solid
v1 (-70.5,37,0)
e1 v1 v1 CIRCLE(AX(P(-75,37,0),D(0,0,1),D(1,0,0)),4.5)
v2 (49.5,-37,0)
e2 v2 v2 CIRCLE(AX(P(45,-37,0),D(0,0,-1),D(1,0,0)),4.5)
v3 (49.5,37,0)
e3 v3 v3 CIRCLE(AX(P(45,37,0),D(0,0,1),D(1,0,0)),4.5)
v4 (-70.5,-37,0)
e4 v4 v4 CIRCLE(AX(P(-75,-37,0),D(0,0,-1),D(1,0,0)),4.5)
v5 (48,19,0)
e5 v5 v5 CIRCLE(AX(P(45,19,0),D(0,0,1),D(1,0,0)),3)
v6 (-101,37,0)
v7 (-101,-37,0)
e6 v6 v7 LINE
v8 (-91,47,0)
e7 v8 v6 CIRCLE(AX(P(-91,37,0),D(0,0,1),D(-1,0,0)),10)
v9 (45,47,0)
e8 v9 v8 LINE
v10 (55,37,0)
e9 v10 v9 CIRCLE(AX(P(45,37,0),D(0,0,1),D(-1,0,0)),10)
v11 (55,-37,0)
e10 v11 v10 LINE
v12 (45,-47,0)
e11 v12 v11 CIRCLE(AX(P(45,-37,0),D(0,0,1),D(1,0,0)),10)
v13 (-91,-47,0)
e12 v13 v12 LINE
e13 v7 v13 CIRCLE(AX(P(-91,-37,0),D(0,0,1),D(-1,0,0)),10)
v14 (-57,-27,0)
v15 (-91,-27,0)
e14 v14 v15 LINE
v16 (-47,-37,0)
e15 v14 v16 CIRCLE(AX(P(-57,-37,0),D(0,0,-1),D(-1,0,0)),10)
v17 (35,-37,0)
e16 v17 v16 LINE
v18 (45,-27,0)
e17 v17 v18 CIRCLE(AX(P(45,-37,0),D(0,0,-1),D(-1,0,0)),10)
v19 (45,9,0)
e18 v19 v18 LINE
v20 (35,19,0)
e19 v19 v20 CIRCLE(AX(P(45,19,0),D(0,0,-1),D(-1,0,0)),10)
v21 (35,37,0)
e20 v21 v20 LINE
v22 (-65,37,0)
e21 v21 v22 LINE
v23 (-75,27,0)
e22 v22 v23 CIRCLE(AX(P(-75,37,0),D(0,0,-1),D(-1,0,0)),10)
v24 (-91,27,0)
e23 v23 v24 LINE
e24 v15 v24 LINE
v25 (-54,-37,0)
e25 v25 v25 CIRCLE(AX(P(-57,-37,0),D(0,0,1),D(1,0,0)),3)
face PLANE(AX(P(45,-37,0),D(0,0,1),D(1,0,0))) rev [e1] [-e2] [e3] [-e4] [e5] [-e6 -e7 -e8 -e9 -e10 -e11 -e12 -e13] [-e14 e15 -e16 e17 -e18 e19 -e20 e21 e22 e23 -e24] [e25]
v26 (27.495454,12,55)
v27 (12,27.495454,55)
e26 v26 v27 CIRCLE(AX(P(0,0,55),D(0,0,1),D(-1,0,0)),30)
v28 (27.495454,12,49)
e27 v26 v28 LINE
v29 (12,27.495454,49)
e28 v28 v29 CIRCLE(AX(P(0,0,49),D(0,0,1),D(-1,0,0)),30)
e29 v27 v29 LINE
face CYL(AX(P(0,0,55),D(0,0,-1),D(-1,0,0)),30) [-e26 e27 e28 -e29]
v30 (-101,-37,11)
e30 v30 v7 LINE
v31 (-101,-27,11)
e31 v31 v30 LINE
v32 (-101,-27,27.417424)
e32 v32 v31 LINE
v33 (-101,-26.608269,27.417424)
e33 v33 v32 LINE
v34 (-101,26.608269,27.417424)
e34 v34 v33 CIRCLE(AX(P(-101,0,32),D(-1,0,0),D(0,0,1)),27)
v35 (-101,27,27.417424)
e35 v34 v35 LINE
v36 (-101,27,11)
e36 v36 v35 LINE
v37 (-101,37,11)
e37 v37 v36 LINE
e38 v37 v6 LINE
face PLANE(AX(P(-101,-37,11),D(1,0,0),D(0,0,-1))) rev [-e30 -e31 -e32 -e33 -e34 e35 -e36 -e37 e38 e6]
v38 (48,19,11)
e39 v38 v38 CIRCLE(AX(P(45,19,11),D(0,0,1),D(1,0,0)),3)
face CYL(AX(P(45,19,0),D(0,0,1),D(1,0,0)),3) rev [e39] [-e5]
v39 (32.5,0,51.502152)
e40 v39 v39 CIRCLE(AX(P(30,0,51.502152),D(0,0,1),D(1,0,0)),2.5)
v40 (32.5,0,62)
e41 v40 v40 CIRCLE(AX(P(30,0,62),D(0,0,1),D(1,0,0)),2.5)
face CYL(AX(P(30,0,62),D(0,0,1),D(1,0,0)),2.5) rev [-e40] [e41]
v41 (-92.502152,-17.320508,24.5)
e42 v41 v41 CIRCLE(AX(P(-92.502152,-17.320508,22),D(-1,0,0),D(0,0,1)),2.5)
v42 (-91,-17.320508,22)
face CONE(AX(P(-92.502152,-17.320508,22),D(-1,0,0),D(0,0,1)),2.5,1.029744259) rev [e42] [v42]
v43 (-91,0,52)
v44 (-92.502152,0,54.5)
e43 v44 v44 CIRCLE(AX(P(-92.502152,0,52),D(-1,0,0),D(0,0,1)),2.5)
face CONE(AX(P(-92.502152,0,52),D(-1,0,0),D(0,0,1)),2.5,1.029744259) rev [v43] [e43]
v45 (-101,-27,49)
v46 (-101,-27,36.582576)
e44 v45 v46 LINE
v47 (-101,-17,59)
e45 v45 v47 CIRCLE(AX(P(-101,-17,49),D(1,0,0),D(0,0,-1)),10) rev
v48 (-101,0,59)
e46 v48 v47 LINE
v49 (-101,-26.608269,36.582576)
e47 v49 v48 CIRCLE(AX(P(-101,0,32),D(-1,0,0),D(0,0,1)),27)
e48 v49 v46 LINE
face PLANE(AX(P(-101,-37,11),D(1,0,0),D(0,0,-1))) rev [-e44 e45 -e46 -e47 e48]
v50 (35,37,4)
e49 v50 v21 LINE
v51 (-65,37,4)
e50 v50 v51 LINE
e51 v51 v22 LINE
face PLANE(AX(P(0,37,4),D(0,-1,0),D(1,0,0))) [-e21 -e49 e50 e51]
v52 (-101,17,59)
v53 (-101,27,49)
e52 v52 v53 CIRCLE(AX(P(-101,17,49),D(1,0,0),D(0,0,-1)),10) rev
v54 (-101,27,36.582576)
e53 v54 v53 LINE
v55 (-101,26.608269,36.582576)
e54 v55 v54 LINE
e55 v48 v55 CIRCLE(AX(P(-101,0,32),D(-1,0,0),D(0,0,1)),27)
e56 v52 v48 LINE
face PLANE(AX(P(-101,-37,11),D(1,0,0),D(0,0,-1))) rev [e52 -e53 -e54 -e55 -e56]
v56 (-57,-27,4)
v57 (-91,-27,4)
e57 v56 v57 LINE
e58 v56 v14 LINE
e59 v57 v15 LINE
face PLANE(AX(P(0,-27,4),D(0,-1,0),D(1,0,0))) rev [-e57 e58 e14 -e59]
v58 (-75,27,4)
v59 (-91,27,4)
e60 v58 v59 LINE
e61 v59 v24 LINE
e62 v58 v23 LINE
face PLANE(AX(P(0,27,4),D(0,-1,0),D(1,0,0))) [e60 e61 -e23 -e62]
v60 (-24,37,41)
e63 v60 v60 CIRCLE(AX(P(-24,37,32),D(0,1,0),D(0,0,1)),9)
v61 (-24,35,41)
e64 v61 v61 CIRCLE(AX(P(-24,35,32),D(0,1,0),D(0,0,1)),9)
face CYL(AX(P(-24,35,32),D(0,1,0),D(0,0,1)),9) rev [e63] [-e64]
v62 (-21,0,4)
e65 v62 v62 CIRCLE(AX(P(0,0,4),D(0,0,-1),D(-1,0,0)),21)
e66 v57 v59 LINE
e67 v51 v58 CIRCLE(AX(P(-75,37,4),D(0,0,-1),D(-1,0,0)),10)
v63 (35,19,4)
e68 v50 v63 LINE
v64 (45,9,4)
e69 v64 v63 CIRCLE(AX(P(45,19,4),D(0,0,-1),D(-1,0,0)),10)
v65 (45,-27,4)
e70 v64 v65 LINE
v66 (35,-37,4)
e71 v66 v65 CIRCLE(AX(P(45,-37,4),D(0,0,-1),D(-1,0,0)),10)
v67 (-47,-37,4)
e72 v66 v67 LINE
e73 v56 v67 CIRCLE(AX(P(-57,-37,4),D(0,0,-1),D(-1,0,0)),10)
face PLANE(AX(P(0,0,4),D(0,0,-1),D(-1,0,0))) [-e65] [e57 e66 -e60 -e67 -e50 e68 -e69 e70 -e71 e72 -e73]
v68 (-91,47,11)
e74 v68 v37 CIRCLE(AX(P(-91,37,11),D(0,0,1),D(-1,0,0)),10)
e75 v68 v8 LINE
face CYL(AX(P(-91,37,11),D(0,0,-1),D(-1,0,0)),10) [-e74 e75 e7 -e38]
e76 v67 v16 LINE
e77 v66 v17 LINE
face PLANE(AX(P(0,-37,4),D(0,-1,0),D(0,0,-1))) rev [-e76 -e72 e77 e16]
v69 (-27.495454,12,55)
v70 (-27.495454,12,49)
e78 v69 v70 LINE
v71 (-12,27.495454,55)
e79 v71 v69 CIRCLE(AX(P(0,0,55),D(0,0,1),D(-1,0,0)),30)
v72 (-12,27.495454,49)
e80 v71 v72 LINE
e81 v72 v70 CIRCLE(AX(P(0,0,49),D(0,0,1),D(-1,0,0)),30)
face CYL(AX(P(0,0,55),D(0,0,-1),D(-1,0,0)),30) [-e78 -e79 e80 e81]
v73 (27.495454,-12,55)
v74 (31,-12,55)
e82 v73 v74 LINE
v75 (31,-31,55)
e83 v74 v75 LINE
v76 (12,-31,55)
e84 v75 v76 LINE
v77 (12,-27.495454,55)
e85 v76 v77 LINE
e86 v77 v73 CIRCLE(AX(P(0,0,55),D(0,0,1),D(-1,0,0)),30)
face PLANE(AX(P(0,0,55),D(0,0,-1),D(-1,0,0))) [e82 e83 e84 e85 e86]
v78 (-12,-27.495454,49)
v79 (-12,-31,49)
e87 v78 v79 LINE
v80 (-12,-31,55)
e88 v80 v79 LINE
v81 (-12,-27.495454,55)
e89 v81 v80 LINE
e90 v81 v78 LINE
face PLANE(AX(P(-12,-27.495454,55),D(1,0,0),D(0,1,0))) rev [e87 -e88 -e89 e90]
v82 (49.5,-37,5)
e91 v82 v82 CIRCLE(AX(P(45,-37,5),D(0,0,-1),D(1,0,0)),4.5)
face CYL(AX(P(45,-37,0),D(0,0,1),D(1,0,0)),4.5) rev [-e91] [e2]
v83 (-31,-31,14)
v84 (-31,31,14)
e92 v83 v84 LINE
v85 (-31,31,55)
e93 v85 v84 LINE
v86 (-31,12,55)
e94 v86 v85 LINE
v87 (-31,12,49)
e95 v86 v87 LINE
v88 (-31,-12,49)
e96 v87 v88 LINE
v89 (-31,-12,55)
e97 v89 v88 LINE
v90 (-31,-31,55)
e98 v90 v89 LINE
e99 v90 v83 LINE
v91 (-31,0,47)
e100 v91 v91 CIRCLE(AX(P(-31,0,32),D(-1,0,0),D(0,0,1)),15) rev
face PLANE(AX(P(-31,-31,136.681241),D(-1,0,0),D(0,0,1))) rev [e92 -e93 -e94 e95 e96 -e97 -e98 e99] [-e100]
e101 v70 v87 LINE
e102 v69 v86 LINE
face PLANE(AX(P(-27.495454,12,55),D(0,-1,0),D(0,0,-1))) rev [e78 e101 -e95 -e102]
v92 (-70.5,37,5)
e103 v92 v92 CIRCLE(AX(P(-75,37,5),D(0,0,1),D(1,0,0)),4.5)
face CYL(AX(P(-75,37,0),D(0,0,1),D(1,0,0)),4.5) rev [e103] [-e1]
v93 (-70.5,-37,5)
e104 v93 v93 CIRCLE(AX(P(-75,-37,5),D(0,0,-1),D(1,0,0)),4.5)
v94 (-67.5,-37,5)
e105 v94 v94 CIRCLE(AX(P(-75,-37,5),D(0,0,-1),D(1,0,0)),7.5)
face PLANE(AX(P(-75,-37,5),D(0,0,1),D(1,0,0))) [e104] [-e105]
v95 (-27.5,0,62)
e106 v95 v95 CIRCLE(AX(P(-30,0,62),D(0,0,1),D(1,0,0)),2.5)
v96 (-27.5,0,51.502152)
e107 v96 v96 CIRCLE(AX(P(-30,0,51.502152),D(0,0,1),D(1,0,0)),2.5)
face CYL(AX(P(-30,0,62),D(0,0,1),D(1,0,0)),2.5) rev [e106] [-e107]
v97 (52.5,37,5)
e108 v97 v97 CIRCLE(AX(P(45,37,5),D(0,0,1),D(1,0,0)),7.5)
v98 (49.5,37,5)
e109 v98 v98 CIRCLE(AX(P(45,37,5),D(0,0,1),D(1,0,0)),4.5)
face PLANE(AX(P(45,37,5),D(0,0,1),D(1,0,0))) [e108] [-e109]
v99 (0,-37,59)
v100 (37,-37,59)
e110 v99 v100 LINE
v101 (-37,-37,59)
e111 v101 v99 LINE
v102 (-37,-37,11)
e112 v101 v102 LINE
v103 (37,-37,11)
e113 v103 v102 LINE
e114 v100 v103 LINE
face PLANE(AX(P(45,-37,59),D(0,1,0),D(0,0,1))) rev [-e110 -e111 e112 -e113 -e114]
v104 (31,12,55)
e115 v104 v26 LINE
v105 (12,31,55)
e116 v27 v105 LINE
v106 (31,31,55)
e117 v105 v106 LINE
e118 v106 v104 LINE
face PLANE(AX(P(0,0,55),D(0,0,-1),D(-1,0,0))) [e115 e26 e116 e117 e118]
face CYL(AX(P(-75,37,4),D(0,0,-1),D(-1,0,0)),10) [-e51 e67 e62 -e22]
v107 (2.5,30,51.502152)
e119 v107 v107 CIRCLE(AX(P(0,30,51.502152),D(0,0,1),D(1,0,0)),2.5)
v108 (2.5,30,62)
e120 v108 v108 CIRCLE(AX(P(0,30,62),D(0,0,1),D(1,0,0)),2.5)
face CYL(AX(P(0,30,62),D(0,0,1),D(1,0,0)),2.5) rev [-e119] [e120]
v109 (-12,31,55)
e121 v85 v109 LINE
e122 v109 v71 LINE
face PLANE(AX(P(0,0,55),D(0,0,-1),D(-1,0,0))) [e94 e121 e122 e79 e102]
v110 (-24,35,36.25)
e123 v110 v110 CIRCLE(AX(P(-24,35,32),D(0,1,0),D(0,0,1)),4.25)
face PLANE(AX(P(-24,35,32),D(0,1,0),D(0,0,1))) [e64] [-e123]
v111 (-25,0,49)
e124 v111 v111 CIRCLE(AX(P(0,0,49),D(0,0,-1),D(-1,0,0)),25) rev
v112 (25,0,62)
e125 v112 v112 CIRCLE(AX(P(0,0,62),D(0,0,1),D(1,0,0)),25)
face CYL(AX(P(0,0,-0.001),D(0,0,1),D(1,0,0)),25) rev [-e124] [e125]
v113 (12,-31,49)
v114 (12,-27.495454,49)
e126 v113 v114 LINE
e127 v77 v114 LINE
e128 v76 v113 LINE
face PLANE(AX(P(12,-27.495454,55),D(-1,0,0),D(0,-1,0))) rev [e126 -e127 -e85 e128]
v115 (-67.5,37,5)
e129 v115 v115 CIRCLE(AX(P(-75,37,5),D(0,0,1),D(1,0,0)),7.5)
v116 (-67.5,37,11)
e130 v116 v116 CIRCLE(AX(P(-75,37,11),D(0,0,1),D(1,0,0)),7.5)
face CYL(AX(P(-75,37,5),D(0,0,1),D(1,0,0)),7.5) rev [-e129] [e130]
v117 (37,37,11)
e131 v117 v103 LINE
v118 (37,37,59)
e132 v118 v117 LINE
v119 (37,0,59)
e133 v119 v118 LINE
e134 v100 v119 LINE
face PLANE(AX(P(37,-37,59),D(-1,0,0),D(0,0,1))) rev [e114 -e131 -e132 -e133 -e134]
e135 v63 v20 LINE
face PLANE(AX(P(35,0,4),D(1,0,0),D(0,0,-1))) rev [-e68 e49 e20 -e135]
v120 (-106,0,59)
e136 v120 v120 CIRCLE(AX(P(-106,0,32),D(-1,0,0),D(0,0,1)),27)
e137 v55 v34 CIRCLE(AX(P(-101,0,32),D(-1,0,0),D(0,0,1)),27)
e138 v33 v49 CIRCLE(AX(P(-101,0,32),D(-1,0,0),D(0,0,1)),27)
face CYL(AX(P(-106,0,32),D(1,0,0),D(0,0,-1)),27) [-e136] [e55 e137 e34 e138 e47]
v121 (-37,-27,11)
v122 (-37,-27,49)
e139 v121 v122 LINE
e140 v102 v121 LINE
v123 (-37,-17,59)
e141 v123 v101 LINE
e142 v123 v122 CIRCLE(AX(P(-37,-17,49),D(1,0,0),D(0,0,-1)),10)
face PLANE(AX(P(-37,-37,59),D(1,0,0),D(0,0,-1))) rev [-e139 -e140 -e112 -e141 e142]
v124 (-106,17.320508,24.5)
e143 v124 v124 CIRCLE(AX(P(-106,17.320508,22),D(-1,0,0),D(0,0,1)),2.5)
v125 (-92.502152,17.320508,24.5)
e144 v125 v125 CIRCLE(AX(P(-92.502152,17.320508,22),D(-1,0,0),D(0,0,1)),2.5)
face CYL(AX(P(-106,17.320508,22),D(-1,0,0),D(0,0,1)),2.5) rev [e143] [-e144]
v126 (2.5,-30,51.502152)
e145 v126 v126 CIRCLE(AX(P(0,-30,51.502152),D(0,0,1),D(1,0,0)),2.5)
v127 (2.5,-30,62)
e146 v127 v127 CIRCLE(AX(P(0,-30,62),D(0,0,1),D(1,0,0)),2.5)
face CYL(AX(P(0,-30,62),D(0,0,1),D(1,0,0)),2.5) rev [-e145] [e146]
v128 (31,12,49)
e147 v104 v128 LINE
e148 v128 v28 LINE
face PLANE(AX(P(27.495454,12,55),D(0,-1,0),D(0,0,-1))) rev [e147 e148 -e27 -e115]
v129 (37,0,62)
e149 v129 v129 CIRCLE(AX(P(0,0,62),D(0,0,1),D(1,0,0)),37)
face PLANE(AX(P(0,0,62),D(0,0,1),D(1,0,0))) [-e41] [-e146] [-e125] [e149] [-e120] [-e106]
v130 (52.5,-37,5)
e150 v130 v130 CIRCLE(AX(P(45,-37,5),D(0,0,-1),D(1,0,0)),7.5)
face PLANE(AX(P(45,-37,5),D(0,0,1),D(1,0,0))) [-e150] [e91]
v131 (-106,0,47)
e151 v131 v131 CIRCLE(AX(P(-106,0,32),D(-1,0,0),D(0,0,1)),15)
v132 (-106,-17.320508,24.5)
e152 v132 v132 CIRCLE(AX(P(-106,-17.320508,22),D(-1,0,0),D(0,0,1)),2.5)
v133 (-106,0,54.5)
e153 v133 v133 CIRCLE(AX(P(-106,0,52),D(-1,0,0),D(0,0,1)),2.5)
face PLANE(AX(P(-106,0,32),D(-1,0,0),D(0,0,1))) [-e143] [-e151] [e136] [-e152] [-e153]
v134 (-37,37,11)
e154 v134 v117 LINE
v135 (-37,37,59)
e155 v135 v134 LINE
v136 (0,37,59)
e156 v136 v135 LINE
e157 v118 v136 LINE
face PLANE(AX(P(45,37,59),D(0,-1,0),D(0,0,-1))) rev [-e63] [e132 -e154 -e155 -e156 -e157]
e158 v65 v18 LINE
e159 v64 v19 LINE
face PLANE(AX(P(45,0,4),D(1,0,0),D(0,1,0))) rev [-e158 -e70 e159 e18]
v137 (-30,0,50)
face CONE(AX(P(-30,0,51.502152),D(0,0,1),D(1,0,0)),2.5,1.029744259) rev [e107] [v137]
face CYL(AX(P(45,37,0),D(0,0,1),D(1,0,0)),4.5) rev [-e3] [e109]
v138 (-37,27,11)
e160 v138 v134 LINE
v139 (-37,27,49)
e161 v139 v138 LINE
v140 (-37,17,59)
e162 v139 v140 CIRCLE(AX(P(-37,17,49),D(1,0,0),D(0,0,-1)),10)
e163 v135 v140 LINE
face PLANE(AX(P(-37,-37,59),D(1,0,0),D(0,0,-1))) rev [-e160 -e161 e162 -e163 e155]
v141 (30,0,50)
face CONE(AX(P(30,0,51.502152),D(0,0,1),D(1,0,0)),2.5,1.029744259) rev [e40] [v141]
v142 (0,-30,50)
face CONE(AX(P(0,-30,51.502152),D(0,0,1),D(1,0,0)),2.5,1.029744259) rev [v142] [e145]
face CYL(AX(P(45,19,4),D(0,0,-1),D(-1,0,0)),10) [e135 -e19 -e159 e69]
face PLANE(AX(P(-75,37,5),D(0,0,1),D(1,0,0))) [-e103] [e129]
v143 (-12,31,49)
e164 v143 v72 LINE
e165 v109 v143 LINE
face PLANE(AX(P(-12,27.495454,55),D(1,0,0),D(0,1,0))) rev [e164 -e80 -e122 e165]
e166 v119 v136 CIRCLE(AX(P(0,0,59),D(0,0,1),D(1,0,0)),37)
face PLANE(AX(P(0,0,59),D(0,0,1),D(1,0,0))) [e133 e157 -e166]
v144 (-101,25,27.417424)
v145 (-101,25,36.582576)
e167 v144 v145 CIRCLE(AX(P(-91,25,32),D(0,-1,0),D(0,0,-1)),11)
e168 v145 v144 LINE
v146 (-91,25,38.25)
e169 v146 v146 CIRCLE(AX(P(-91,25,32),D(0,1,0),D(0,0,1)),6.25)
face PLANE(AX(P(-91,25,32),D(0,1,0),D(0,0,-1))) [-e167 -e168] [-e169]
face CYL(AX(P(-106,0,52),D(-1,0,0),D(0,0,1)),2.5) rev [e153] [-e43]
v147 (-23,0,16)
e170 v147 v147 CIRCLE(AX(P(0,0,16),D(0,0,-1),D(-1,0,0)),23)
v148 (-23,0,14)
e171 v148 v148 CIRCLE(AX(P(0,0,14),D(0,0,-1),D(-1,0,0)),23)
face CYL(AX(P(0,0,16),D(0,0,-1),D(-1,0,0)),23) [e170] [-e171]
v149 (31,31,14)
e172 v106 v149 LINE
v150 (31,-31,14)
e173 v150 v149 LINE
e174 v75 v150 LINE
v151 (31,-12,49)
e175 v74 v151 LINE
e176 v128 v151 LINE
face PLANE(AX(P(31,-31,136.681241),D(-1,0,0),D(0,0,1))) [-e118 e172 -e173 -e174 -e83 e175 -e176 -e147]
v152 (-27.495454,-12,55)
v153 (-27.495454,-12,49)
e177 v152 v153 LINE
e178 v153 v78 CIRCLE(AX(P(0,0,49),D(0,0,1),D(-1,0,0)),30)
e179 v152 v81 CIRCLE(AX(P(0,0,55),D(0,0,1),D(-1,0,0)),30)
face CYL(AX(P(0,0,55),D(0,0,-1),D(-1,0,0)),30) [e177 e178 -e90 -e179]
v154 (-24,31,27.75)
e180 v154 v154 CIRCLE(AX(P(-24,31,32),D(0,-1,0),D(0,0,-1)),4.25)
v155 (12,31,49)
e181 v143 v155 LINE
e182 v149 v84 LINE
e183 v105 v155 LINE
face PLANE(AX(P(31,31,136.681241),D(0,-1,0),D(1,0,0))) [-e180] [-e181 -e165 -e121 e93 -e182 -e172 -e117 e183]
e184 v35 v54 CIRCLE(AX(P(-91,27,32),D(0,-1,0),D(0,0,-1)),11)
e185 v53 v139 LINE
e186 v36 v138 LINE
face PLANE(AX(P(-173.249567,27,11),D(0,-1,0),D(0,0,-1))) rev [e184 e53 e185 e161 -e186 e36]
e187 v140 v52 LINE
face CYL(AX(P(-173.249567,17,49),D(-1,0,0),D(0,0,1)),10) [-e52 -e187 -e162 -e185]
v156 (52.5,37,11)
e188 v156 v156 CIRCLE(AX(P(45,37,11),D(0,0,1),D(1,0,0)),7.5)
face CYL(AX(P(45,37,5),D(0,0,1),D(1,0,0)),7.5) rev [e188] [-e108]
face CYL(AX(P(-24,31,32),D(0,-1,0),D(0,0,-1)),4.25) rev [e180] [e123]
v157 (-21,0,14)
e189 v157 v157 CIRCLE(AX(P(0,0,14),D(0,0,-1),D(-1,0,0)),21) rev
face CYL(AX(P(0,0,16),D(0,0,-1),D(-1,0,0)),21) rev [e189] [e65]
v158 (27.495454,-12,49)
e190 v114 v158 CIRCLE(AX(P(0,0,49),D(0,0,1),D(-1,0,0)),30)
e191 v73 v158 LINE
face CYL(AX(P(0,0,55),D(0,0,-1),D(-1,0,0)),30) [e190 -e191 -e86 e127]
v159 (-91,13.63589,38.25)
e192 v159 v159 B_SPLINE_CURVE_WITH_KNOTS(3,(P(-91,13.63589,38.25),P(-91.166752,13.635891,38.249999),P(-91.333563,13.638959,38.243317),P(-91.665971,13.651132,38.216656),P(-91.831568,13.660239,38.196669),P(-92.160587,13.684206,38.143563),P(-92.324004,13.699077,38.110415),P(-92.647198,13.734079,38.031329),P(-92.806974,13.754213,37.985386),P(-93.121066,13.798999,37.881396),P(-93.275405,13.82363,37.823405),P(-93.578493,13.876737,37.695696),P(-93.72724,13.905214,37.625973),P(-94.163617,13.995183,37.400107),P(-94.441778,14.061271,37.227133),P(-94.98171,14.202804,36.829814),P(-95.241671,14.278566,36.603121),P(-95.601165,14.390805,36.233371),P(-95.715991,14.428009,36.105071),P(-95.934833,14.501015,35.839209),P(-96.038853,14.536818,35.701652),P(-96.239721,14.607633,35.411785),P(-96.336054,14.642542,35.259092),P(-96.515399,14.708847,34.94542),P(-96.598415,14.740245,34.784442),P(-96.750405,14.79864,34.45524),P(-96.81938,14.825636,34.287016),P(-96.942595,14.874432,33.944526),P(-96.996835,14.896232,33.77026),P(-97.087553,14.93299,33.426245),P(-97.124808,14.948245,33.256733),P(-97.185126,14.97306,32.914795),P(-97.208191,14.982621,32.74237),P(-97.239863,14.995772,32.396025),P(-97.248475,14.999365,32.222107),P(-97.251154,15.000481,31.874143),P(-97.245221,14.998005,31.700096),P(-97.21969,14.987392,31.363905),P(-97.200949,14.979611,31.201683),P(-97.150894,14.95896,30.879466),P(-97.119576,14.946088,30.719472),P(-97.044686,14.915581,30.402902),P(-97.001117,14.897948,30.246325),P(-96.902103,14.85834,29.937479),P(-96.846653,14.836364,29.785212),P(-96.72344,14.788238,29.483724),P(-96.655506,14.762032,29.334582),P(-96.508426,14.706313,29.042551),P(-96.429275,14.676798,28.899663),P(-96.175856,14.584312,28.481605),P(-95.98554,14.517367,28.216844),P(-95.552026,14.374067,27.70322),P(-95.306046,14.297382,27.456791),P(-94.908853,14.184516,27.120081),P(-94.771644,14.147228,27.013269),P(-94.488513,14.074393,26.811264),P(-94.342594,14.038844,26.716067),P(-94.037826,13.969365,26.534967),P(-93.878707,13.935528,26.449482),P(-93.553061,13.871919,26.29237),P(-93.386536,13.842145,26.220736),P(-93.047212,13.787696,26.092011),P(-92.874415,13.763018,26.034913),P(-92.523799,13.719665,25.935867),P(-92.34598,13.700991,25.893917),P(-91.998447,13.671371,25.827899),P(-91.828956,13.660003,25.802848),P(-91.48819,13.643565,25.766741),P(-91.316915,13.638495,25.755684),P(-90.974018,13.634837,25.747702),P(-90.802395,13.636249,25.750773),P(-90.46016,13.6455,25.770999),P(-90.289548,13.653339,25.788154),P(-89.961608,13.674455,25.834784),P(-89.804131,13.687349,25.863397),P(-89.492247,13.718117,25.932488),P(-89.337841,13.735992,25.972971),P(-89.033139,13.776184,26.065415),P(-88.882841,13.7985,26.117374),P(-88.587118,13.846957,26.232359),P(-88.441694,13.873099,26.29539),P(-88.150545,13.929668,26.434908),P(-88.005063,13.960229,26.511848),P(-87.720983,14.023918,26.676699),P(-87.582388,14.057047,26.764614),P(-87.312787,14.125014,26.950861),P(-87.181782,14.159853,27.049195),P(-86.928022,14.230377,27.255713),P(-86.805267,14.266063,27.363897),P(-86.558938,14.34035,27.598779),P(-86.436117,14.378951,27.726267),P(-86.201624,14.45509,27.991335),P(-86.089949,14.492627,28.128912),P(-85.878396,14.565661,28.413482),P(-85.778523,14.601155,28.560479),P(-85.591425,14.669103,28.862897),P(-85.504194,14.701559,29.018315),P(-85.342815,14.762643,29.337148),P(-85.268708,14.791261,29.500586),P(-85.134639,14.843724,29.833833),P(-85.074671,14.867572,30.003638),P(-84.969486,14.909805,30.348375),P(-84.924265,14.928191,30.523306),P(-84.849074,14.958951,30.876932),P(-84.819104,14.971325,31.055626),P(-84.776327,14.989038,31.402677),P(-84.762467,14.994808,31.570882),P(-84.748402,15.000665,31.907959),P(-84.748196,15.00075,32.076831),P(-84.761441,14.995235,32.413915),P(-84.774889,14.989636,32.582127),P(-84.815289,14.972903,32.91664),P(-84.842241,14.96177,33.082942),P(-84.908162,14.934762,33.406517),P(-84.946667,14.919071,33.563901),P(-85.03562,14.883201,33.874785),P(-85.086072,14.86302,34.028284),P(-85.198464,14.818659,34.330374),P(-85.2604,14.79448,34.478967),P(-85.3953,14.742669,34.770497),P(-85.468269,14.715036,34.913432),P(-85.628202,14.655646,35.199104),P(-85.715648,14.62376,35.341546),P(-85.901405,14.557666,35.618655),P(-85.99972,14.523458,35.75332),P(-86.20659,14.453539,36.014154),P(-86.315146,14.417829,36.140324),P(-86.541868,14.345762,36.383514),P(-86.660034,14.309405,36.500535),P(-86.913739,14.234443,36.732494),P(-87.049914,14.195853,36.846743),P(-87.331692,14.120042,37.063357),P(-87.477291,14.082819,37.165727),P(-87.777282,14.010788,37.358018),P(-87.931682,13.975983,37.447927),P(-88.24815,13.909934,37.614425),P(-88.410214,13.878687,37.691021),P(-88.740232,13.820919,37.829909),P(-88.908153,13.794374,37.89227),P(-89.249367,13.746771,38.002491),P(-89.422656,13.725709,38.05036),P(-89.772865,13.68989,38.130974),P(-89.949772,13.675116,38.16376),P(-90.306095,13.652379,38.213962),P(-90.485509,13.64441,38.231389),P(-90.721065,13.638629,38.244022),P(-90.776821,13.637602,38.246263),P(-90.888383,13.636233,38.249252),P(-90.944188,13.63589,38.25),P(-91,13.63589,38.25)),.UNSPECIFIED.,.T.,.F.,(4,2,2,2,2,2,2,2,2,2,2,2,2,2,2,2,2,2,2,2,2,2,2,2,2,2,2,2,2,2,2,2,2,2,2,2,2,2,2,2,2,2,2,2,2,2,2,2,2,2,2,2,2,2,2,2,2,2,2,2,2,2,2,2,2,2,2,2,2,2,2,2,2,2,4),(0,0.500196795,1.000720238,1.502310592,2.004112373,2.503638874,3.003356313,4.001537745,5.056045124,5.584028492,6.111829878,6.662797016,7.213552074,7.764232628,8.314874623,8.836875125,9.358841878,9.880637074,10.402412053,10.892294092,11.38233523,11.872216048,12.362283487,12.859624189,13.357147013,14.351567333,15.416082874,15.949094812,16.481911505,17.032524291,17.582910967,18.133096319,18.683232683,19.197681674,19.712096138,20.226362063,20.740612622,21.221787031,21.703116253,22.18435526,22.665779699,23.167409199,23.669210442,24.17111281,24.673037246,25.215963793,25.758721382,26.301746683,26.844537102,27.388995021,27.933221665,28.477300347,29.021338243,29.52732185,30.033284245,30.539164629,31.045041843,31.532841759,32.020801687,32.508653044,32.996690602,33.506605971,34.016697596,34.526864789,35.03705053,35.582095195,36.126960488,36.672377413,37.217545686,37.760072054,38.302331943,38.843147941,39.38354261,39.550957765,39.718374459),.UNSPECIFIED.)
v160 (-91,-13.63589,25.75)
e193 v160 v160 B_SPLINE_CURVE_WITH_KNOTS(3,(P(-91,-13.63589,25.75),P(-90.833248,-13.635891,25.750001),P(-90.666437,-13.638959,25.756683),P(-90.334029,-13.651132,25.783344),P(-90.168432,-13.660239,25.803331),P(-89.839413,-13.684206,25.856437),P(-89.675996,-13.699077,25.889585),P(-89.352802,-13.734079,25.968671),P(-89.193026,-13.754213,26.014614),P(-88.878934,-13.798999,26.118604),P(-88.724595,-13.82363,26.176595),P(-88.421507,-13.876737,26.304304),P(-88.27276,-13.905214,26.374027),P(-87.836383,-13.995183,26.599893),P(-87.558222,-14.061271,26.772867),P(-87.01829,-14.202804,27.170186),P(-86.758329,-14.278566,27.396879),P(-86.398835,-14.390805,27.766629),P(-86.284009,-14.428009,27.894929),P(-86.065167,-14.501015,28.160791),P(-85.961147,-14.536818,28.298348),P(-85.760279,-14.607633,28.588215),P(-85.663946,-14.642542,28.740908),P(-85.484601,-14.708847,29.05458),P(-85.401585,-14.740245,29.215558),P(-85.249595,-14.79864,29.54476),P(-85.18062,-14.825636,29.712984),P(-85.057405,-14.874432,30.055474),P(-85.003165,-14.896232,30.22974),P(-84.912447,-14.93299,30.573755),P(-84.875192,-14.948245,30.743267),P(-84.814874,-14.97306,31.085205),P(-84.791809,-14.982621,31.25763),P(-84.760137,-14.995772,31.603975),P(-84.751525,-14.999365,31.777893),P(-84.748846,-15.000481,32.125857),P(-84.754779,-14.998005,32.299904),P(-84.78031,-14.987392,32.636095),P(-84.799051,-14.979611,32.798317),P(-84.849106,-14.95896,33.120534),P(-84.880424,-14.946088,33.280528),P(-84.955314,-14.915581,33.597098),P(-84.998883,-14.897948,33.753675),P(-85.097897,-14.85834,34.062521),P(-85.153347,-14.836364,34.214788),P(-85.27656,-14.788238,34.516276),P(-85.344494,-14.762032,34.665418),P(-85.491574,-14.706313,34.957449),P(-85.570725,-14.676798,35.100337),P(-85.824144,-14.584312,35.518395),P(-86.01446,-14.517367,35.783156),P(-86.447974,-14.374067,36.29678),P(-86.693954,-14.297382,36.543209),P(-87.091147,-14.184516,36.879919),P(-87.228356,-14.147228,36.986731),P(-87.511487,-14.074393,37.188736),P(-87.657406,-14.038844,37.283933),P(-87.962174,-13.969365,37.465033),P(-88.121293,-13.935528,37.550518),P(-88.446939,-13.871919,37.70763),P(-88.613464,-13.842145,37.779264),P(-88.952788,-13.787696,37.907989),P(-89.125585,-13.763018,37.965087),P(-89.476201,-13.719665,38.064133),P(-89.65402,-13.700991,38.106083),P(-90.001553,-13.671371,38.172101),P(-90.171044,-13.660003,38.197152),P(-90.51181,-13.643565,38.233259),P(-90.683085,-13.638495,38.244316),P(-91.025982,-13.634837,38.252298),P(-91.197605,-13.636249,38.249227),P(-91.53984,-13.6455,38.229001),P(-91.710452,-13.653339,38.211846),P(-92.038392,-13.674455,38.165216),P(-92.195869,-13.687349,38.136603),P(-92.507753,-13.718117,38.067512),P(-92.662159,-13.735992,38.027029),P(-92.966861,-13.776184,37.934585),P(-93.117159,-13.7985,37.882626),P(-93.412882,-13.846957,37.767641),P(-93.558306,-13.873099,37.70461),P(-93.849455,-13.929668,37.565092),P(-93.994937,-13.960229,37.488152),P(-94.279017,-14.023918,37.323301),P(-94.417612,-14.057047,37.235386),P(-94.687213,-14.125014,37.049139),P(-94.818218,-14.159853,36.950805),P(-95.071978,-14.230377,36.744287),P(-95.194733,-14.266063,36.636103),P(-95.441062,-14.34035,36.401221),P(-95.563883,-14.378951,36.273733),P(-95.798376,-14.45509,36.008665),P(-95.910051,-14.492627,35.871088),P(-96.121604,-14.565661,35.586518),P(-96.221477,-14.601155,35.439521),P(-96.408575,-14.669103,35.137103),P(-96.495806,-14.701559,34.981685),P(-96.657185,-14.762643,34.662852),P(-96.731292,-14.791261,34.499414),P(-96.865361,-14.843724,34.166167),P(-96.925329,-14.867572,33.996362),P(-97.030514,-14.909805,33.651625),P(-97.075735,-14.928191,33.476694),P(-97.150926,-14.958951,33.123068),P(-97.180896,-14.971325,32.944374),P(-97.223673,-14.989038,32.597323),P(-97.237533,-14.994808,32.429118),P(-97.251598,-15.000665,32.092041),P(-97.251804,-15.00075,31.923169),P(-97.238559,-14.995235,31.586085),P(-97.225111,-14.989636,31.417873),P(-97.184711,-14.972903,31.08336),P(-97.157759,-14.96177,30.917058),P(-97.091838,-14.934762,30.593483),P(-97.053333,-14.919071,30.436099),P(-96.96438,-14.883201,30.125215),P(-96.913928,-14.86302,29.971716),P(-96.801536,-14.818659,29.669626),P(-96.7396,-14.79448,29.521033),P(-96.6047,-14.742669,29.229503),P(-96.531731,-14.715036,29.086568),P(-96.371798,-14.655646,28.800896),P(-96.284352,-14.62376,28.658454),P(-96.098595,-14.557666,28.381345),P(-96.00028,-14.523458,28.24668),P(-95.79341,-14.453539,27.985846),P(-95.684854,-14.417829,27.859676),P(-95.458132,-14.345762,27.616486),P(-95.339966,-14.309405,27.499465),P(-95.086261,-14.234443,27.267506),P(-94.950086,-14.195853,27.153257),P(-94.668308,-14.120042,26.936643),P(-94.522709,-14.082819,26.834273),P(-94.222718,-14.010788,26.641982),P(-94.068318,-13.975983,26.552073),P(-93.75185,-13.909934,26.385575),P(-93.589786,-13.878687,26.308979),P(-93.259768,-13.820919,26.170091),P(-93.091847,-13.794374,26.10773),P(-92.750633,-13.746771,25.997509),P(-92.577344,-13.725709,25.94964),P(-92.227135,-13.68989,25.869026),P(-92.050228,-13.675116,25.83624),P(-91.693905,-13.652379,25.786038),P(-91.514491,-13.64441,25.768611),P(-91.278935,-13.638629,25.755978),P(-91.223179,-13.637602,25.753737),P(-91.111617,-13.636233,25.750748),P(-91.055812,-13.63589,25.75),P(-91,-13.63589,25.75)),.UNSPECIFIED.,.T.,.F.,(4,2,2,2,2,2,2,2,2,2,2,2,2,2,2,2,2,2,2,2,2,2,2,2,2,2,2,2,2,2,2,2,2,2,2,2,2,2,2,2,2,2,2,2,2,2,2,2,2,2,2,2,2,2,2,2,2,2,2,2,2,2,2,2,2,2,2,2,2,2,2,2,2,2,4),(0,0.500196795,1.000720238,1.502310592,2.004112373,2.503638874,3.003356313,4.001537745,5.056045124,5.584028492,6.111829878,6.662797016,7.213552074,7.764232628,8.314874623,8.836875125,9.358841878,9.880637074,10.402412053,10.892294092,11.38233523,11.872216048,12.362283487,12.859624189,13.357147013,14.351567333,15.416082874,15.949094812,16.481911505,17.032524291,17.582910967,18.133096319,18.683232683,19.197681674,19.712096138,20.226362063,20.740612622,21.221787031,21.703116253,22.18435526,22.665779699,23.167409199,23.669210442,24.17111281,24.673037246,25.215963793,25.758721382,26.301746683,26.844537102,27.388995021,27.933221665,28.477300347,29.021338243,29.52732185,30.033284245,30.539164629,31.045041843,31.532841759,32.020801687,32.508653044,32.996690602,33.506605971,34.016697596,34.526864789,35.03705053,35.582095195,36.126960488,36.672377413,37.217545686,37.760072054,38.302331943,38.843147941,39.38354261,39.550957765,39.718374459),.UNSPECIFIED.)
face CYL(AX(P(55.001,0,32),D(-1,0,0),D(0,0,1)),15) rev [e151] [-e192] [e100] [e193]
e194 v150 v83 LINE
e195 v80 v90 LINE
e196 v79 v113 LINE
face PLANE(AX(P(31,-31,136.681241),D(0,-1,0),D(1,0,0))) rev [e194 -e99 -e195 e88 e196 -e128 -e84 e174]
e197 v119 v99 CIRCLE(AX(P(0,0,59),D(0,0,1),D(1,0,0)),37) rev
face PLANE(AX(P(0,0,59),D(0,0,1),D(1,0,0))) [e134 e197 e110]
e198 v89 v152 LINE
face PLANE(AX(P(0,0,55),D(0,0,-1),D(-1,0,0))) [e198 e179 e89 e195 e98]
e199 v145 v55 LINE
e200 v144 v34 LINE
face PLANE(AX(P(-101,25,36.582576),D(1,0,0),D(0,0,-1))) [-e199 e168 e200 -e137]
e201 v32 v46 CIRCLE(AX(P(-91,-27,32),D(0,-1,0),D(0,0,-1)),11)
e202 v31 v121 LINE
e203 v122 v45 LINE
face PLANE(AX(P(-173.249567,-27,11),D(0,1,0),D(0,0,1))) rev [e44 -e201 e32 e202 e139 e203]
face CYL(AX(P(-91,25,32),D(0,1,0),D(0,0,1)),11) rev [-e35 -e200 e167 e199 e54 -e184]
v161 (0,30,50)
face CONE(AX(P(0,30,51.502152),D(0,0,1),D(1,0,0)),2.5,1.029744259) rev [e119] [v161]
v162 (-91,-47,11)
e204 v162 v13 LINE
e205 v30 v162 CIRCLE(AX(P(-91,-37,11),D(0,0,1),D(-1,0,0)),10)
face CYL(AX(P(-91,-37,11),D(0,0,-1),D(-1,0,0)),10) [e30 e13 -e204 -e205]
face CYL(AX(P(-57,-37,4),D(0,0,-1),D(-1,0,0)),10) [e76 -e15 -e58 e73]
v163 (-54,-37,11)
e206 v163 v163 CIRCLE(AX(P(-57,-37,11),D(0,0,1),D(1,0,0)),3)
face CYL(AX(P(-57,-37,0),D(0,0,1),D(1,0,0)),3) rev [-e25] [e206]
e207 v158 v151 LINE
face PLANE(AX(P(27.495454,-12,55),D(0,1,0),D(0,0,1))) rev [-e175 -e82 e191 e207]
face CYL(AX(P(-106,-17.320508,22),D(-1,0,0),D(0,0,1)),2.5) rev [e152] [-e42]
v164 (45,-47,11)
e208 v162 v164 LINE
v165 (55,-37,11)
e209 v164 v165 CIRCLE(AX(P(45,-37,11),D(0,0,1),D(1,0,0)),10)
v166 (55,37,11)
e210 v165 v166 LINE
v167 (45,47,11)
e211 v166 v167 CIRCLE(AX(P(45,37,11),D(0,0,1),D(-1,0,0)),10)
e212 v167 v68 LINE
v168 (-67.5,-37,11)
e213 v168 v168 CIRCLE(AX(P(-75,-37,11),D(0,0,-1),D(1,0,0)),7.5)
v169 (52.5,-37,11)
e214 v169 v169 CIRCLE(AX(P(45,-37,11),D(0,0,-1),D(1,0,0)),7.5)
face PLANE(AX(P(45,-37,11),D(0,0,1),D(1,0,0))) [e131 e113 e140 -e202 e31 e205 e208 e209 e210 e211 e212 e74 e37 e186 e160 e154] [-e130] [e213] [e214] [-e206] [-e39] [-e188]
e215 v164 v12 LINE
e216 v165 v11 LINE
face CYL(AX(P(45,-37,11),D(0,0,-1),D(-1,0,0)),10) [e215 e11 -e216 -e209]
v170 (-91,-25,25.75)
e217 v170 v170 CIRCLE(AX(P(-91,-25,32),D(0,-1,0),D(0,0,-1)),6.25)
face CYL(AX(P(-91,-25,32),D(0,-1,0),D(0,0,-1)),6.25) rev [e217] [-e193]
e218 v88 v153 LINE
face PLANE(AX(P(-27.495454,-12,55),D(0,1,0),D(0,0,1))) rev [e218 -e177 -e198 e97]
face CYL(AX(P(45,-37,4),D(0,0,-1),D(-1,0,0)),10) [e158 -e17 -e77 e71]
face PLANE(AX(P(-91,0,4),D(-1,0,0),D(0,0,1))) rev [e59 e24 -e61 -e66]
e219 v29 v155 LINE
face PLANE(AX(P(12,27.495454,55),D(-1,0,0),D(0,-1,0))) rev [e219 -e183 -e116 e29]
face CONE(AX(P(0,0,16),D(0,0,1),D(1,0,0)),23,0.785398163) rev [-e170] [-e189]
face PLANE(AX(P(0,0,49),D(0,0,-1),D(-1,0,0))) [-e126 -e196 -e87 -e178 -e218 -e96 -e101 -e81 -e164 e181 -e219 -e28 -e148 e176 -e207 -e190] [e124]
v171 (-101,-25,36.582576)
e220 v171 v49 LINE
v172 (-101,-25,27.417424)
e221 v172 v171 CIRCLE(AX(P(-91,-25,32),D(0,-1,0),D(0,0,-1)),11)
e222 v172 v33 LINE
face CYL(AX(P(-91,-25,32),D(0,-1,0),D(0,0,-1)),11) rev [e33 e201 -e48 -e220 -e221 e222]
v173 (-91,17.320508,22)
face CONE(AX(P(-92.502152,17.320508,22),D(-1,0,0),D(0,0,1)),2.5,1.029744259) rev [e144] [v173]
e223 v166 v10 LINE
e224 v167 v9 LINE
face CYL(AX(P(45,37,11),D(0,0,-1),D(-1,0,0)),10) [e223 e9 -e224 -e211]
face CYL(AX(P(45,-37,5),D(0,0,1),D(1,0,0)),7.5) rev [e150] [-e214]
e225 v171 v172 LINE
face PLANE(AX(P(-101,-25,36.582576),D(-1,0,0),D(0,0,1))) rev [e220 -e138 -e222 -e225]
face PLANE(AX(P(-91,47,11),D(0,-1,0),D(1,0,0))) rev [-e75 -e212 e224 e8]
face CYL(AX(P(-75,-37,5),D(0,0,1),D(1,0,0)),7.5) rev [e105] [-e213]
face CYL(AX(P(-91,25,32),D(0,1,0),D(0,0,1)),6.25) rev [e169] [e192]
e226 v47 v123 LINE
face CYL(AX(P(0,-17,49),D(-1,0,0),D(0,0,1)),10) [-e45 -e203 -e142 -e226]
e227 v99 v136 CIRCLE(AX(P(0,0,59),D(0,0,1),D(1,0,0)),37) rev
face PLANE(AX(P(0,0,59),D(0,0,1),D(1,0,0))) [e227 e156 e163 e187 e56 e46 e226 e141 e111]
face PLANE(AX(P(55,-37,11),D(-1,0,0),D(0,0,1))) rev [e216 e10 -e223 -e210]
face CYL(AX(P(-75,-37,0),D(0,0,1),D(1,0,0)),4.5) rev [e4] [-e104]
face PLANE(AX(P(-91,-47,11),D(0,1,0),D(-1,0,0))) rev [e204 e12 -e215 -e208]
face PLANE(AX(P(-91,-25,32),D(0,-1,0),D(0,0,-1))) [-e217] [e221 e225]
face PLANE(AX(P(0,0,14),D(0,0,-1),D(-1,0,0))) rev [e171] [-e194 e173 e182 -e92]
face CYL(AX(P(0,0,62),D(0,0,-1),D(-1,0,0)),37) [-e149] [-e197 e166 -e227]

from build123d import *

# Parameters (mm, degrees)
EXTRUDE_1_DEPTH             = 11
EXTRUDE_START               = -11
SKETCH_2_W                  = 74
SKETCH_2_H                  = 74
EXTRUDE_2_DEPTH             = 59
SKETCH_3_W                  = 48
SKETCH_3_H                  = 54
EXTRUDE_3_DEPTH             = 64
SKETCH_4_R                  = 27
EXTRUDE_4_DEPTH             = 5
FILLET_1_R                  = 10
SKETCH_7_R                  = 7.5
CUT_EXTRUDE_1_DEPTH         = 6
SKETCH_8_R                  = 4.5
CUT_EXTRUDE_2_DEPTH         = 128.910124697
SKETCH_9_R                  = 3
CUT_EXTRUDE_3_DEPTH         = 126.495019822
CUT_EXTRUDE_4_DEPTH         = 4
SKETCH_11_R                 = 37
EXTRUDE_5_DEPTH             = 3
CUT_EXTRUDE_START           = -45
SKETCH_14_W                 = 62
SKETCH_14_H                 = 62
CUT_EXTRUDE_6_DEPTH         = 35
SKETCH_13_R                 = 21
CUT_EXTRUDE_5_DEPTH         = 12
SKETCH_15_R                 = 23
SKETCH_15_R_2               = 21
EXTRUDE_6_DEPTH             = 12
CHAMFER_1_SIZE              = 2
CUT_EXTRUDE_7_REACH         = 133.488
SKETCH_12_R                 = 25
CUT_EXTRUDE_8_REACH         = 180.813
SKETCH_17_R                 = 15
CUT_EXTRUDE_9_DEPTH         = 2
M14X1_5_1_REACH             = 144.352
M14X1_5_1_BORE_R            = 6.25
HOLE_WIZARD_M6_1_D          = 5
HOLE_WIZARD_M6_1_DEPTH      = 10.497848452
HOLE_WIZARD_M6_1_TIP        = 1.502151548
SKETCH_25_R                 = 9
CUT_EXTRUDE_10_DEPTH        = 2
HOLE_START                  = 31
HOLE_WIZARD_M10_1_OUTLINE_R = 4.25
HOLE_WIZARD_M10_1_DEPTH     = 4
CUT_EXTRUDE_11_DEPTH        = 6


# Read off the part's stored shape, not the designer's step: M6 螺纹孔2, M10 螺纹孔1
with BuildPart() as part:
    # 草图1 → 凸台-拉伸1 (new body)
    with BuildSketch(Plane.XY):
        with BuildLine():
            Line((-91, -47), (45, -47))
            ThreePointArc((45, -47), (52.071067812, -44.071067812), (55, -37))
            Line((55, -37), (55, 37))
            ThreePointArc((55, 37), (52.071067812, 44.071067812), (45, 47))
            Line((45, 47), (-91, 47))
            ThreePointArc((-91, 47), (-98.071067812, 44.071067812), (-101, 37))
            Line((-101, 37), (-101, -37))
            ThreePointArc((-101, -37), (-98.071067812, -44.071067812), (-91, -47))
        make_face()
    extrude(amount=EXTRUDE_1_DEPTH)

    # 草图2 → 凸台-拉伸2 (add)
    with BuildSketch(Plane.XY.offset(11).offset(EXTRUDE_START)):
        Rectangle(SKETCH_2_W, SKETCH_2_H)
    extrude(amount=EXTRUDE_2_DEPTH)

    # 草图3 → 凸台-拉伸3 (add)
    with BuildSketch(Plane.ZY.offset(37)):
        with Locations((35, 0)):
            Rectangle(SKETCH_3_W, SKETCH_3_H)
    extrude(amount=EXTRUDE_3_DEPTH)

    # 草图4 → 凸台-拉伸4 (add)
    with BuildSketch(Plane.ZY.offset(101)):
        with Locations((32, 0)):
            Circle(SKETCH_4_R)
    extrude(amount=EXTRUDE_4_DEPTH)

    # 圆角1
    fillet_1_edges = [part.edges().sort_by_distance(p)[0] for p in [
        (-69, 27, 59),
        (-69, -27, 59),
    ]]
    fillet(fillet_1_edges, radius=FILLET_1_R)

    # 草图7 → 切除-拉伸1 (cut)
    with BuildSketch(Plane.XY.offset(11)):
        with Locations((45, 37)):
            Circle(SKETCH_7_R)
        with Locations((-75, 37)):
            Circle(SKETCH_7_R)
    cut_extrude_1 = extrude(amount=-CUT_EXTRUDE_1_DEPTH, mode=Mode.SUBTRACT)

    # 草图8 → 切除-拉伸2 (cut, through all)
    with BuildSketch(Plane.XY.offset(5)):
        with Locations((45, 37)):
            Circle(SKETCH_8_R)
        with Locations((-75, 37)):
            Circle(SKETCH_8_R)
    cut_extrude_2 = extrude(amount=-CUT_EXTRUDE_2_DEPTH, mode=Mode.SUBTRACT)

    # 镜向1: 切除-拉伸1, 切除-拉伸2 across plane
    add(cut_extrude_1.mirror(Plane.ZX), mode=Mode.SUBTRACT)
    add(cut_extrude_2.mirror(Plane.ZX), mode=Mode.SUBTRACT)

    # 草图9 → 切除-拉伸3 (cut, through all)
    with BuildSketch(Plane.XY.offset(11)):
        with Locations((45, 19)):
            Circle(SKETCH_9_R)
        with Locations((-57, -37)):
            Circle(SKETCH_9_R)
    extrude(amount=-CUT_EXTRUDE_3_DEPTH, mode=Mode.SUBTRACT)

    # 草图5 → 切除-拉伸4 (cut)
    with BuildSketch(Plane(origin=(0, 0, 0), x_dir=(-1, 0, 0), z_dir=(0, 0, -1))):
        with BuildLine():
            ThreePointArc((65, 37), (67.928932188, 29.928932188), (75, 27))
            Line((75, 27), (91, 27))
            Line((91, 27), (91, -27))
            Line((91, -27), (57, -27))
            ThreePointArc((57, -27), (49.928932188, -29.928932188), (47, -37))
            Line((47, -37), (-35, -37))
            ThreePointArc((-35, -37), (-37.928932188, -29.928932188), (-45, -27))
            Line((-45, -27), (-45, 9))
            ThreePointArc((-45, 9), (-37.928932188, 11.928932188), (-35, 19))
            Line((-35, 19), (-35, 37))
            Line((-35, 37), (65, 37))
        make_face()
    extrude(amount=-CUT_EXTRUDE_4_DEPTH, mode=Mode.SUBTRACT)

    # 草图11 → 凸台-拉伸5 (add)
    with BuildSketch(Plane.XY.offset(59)):
        Circle(SKETCH_11_R)
    extrude(amount=EXTRUDE_5_DEPTH)

    # 草图14 → 切除-拉伸6 (cut)
    with BuildSketch(Plane(origin=(0, 0, 4), x_dir=(-1, 0, 0), z_dir=(0, 0, -1)).offset(CUT_EXTRUDE_START)):
        Rectangle(SKETCH_14_W, SKETCH_14_H)
    extrude(amount=CUT_EXTRUDE_6_DEPTH, mode=Mode.SUBTRACT)

    # 草图13 → 切除-拉伸5 (cut)
    with BuildSketch(Plane(origin=(0, 0, 4), x_dir=(-1, 0, 0), z_dir=(0, 0, -1))):
        Circle(SKETCH_13_R)
    extrude(amount=-CUT_EXTRUDE_5_DEPTH, mode=Mode.SUBTRACT)

    # 草图15 → 凸台-拉伸6 (add)
    with BuildSketch(Plane(origin=(0, 0, 4), x_dir=(-1, 0, 0), z_dir=(0, 0, -1))):
        Circle(SKETCH_15_R)
        Circle(SKETCH_15_R_2, mode=Mode.SUBTRACT)
    extrude(amount=-EXTRUDE_6_DEPTH)

    # 倒角1
    chamfer_1_edges = [part.edges().sort_by_distance(p)[0] for p in [
        (21, 0, 16),
    ]]
    chamfer(chamfer_1_edges, length=CHAMFER_1_SIZE - 0.0001)  # a hair under: the kernel refuses the full size

    # 草图12 → 切除-拉伸7 (cut, up to next)
    with BuildSketch(Plane.XY.offset(62), mode=Mode.PRIVATE) as cut_extrude_7_sk1:
        Circle(SKETCH_12_R)
    cut_extrude_7_tool1 = extrude(cut_extrude_7_sk1.sketch, amount=-CUT_EXTRUDE_7_REACH, mode=Mode.PRIVATE) & part.part
    add(cut_extrude_7_tool1.solids().sort_by_distance((0, 0, 62))[0], mode=Mode.SUBTRACT)

    # 草图17 → 切除-拉伸8 (cut, up to next)
    with BuildSketch(Plane.ZY.offset(106), mode=Mode.PRIVATE) as cut_extrude_8_sk1:
        with Locations((32, 0)):
            Circle(SKETCH_17_R)
    cut_extrude_8_tool1 = extrude(cut_extrude_8_sk1.sketch, amount=-CUT_EXTRUDE_8_REACH, mode=Mode.PRIVATE) & part.part
    add(cut_extrude_8_tool1.solids().sort_by_distance((-106, 0, 32))[0], mode=Mode.SUBTRACT)

    # 草图18 → 切除-拉伸9 (cut)
    with BuildSketch(Plane.XZ.offset(27)):
        with BuildLine():
            Line((-101, 36.582575695), (-101, 32))
            Line((-101, 32), (-101, 27.417424305))
            ThreePointArc((-101, 27.417424305), (-80, 32), (-101, 36.582575695))
        make_face()
    cut_extrude_9 = extrude(amount=-CUT_EXTRUDE_9_DEPTH, mode=Mode.SUBTRACT)

    # M14x1.5 螺纹孔1 bore → M14x1.5 螺纹孔1 (cut, up to next)
    with BuildSketch(Plane.XZ.offset(25), mode=Mode.PRIVATE) as m14x1_5_1_sk1:
        with Locations((-91, 32)):
            Circle(M14X1_5_1_BORE_R)
    m14x1_5_1_tool1 = extrude(m14x1_5_1_sk1.sketch, amount=-M14X1_5_1_REACH, mode=Mode.PRIVATE) & part.part
    m14x1_5_1 = m14x1_5_1_tool1.solids().sort_by_distance((-91, -25, 32))[0]
    add(m14x1_5_1, mode=Mode.SUBTRACT)

    # 镜向2: 切除-拉伸9, M14x1.5 螺纹孔1 across plane
    add(cut_extrude_9.mirror(Plane.ZX), mode=Mode.SUBTRACT)
    add(m14x1_5_1.mirror(Plane.ZX), mode=Mode.SUBTRACT)

    # M6 螺纹孔1
    with Locations(Plane.XY.offset(62)):
        with Locations((30, 0), (0, -30), (-30, 0), (0, 30)):
            Hole(HOLE_WIZARD_M6_1_D / 2, depth=HOLE_WIZARD_M6_1_DEPTH)
            with Locations((0, 0, -(HOLE_WIZARD_M6_1_DEPTH + HOLE_WIZARD_M6_1_TIP / 2))):  # 118° drill point
                Cone(0, HOLE_WIZARD_M6_1_D / 2, HOLE_WIZARD_M6_1_TIP, mode=Mode.SUBTRACT)

    # M6 螺纹孔2 outline → M6 螺纹孔2 (revolve, cut)
    with BuildSketch(Plane(origin=(0, 17.320508076, 22), x_dir=(0, 1, 0), z_dir=(0, 0, -1))):
        Polygon((2.5, -92.502151548), (0, -91), (0, -106), (2.5, -106), align=None)
    revolve(axis=Axis((0, 17.320508076, 22), (1, 0, 0)), mode=Mode.SUBTRACT)

    # Hole Wizard M6 _2 2 outline → Hole Wizard M6 _2 2 (revolve, cut)
    with BuildSketch(Plane(origin=(0, -17.320508076, 22), x_dir=(0, 1, 0), z_dir=(0, 0, -1))):
        Polygon((2.5, -92.502151548), (0, -91), (0, -106), (2.5, -106), align=None)
    revolve(axis=Axis((0, -17.320508076, 22), (1, 0, 0)), mode=Mode.SUBTRACT)

    # Hole Wizard M6 _2 3 outline → Hole Wizard M6 _2 3 (revolve, cut)
    with BuildSketch(Plane.YX.offset(-52)):
        Polygon((2.5, -92.502151548), (0, -91), (0, -106), (2.5, -106), align=None)
    revolve(axis=Axis((0, 0, 52), (1, 0, 0)), mode=Mode.SUBTRACT)

    # 草图25 → 切除-拉伸10 (cut)
    with BuildSketch(Plane(origin=(0, 37, 0), x_dir=(1, 0, 0), z_dir=(0, 1, 0))):
        with Locations(Location((-24, -32, 0), (0, 0, 270))):
            Circle(SKETCH_25_R)
    extrude(amount=-CUT_EXTRUDE_10_DEPTH, mode=Mode.SUBTRACT)

    # M10 螺纹孔1 outline → M10 螺纹孔1 (cut)
    with BuildSketch(Plane(origin=(0, 0, 0), x_dir=(1, 0, 0), z_dir=(0, 1, 0)).offset(HOLE_START)):
        with Locations((-24, -32)):
            Circle(HOLE_WIZARD_M10_1_OUTLINE_R)
    extrude(amount=HOLE_WIZARD_M10_1_DEPTH, mode=Mode.SUBTRACT)

    # 草图16 → 切除-拉伸11 (cut)
    with BuildSketch(Plane(origin=(0, 0, 49), x_dir=(-1, 0, 0), z_dir=(0, 0, -1))):
        with BuildLine():
            Line((31, 31), (12, 31))
            Line((12, 31), (12, 27.49545417))
            ThreePointArc((12, 27.49545417), (21.213203436, 21.213203436), (27.49545417, 12))
            Line((27.49545417, 12), (31, 12))
            Line((31, 12), (31, 31))
        make_face()
        with BuildLine():
            Line((31, -31), (12, -31))
            Line((12, -31), (12, -27.49545417))
            ThreePointArc((12, -27.49545417), (21.213203436, -21.213203436), (27.49545417, -12))
            Line((27.49545417, -12), (31, -12))
            Line((31, -12), (31, -31))
        make_face()
        with BuildLine():
            Line((-31, 31), (-31, 12))
            Line((-31, 12), (-27.49545417, 12))
            ThreePointArc((-27.49545417, 12), (-21.213203436, 21.213203436), (-12, 27.49545417))
            Line((-12, 27.49545417), (-12, 31))
            Line((-12, 31), (-31, 31))
        make_face()
        with BuildLine():
            Line((-27.49545417, -12), (-31, -12))
            Line((-31, -12), (-31, -31))
            Line((-31, -31), (-12, -31))
            Line((-12, -31), (-12, -27.49545417))
            ThreePointArc((-12, -27.49545417), (-21.213203436, -21.213203436), (-27.49545417, -12))
        make_face()
    extrude(amount=-CUT_EXTRUDE_11_DEPTH, mode=Mode.SUBTRACT)


solid = part.part
